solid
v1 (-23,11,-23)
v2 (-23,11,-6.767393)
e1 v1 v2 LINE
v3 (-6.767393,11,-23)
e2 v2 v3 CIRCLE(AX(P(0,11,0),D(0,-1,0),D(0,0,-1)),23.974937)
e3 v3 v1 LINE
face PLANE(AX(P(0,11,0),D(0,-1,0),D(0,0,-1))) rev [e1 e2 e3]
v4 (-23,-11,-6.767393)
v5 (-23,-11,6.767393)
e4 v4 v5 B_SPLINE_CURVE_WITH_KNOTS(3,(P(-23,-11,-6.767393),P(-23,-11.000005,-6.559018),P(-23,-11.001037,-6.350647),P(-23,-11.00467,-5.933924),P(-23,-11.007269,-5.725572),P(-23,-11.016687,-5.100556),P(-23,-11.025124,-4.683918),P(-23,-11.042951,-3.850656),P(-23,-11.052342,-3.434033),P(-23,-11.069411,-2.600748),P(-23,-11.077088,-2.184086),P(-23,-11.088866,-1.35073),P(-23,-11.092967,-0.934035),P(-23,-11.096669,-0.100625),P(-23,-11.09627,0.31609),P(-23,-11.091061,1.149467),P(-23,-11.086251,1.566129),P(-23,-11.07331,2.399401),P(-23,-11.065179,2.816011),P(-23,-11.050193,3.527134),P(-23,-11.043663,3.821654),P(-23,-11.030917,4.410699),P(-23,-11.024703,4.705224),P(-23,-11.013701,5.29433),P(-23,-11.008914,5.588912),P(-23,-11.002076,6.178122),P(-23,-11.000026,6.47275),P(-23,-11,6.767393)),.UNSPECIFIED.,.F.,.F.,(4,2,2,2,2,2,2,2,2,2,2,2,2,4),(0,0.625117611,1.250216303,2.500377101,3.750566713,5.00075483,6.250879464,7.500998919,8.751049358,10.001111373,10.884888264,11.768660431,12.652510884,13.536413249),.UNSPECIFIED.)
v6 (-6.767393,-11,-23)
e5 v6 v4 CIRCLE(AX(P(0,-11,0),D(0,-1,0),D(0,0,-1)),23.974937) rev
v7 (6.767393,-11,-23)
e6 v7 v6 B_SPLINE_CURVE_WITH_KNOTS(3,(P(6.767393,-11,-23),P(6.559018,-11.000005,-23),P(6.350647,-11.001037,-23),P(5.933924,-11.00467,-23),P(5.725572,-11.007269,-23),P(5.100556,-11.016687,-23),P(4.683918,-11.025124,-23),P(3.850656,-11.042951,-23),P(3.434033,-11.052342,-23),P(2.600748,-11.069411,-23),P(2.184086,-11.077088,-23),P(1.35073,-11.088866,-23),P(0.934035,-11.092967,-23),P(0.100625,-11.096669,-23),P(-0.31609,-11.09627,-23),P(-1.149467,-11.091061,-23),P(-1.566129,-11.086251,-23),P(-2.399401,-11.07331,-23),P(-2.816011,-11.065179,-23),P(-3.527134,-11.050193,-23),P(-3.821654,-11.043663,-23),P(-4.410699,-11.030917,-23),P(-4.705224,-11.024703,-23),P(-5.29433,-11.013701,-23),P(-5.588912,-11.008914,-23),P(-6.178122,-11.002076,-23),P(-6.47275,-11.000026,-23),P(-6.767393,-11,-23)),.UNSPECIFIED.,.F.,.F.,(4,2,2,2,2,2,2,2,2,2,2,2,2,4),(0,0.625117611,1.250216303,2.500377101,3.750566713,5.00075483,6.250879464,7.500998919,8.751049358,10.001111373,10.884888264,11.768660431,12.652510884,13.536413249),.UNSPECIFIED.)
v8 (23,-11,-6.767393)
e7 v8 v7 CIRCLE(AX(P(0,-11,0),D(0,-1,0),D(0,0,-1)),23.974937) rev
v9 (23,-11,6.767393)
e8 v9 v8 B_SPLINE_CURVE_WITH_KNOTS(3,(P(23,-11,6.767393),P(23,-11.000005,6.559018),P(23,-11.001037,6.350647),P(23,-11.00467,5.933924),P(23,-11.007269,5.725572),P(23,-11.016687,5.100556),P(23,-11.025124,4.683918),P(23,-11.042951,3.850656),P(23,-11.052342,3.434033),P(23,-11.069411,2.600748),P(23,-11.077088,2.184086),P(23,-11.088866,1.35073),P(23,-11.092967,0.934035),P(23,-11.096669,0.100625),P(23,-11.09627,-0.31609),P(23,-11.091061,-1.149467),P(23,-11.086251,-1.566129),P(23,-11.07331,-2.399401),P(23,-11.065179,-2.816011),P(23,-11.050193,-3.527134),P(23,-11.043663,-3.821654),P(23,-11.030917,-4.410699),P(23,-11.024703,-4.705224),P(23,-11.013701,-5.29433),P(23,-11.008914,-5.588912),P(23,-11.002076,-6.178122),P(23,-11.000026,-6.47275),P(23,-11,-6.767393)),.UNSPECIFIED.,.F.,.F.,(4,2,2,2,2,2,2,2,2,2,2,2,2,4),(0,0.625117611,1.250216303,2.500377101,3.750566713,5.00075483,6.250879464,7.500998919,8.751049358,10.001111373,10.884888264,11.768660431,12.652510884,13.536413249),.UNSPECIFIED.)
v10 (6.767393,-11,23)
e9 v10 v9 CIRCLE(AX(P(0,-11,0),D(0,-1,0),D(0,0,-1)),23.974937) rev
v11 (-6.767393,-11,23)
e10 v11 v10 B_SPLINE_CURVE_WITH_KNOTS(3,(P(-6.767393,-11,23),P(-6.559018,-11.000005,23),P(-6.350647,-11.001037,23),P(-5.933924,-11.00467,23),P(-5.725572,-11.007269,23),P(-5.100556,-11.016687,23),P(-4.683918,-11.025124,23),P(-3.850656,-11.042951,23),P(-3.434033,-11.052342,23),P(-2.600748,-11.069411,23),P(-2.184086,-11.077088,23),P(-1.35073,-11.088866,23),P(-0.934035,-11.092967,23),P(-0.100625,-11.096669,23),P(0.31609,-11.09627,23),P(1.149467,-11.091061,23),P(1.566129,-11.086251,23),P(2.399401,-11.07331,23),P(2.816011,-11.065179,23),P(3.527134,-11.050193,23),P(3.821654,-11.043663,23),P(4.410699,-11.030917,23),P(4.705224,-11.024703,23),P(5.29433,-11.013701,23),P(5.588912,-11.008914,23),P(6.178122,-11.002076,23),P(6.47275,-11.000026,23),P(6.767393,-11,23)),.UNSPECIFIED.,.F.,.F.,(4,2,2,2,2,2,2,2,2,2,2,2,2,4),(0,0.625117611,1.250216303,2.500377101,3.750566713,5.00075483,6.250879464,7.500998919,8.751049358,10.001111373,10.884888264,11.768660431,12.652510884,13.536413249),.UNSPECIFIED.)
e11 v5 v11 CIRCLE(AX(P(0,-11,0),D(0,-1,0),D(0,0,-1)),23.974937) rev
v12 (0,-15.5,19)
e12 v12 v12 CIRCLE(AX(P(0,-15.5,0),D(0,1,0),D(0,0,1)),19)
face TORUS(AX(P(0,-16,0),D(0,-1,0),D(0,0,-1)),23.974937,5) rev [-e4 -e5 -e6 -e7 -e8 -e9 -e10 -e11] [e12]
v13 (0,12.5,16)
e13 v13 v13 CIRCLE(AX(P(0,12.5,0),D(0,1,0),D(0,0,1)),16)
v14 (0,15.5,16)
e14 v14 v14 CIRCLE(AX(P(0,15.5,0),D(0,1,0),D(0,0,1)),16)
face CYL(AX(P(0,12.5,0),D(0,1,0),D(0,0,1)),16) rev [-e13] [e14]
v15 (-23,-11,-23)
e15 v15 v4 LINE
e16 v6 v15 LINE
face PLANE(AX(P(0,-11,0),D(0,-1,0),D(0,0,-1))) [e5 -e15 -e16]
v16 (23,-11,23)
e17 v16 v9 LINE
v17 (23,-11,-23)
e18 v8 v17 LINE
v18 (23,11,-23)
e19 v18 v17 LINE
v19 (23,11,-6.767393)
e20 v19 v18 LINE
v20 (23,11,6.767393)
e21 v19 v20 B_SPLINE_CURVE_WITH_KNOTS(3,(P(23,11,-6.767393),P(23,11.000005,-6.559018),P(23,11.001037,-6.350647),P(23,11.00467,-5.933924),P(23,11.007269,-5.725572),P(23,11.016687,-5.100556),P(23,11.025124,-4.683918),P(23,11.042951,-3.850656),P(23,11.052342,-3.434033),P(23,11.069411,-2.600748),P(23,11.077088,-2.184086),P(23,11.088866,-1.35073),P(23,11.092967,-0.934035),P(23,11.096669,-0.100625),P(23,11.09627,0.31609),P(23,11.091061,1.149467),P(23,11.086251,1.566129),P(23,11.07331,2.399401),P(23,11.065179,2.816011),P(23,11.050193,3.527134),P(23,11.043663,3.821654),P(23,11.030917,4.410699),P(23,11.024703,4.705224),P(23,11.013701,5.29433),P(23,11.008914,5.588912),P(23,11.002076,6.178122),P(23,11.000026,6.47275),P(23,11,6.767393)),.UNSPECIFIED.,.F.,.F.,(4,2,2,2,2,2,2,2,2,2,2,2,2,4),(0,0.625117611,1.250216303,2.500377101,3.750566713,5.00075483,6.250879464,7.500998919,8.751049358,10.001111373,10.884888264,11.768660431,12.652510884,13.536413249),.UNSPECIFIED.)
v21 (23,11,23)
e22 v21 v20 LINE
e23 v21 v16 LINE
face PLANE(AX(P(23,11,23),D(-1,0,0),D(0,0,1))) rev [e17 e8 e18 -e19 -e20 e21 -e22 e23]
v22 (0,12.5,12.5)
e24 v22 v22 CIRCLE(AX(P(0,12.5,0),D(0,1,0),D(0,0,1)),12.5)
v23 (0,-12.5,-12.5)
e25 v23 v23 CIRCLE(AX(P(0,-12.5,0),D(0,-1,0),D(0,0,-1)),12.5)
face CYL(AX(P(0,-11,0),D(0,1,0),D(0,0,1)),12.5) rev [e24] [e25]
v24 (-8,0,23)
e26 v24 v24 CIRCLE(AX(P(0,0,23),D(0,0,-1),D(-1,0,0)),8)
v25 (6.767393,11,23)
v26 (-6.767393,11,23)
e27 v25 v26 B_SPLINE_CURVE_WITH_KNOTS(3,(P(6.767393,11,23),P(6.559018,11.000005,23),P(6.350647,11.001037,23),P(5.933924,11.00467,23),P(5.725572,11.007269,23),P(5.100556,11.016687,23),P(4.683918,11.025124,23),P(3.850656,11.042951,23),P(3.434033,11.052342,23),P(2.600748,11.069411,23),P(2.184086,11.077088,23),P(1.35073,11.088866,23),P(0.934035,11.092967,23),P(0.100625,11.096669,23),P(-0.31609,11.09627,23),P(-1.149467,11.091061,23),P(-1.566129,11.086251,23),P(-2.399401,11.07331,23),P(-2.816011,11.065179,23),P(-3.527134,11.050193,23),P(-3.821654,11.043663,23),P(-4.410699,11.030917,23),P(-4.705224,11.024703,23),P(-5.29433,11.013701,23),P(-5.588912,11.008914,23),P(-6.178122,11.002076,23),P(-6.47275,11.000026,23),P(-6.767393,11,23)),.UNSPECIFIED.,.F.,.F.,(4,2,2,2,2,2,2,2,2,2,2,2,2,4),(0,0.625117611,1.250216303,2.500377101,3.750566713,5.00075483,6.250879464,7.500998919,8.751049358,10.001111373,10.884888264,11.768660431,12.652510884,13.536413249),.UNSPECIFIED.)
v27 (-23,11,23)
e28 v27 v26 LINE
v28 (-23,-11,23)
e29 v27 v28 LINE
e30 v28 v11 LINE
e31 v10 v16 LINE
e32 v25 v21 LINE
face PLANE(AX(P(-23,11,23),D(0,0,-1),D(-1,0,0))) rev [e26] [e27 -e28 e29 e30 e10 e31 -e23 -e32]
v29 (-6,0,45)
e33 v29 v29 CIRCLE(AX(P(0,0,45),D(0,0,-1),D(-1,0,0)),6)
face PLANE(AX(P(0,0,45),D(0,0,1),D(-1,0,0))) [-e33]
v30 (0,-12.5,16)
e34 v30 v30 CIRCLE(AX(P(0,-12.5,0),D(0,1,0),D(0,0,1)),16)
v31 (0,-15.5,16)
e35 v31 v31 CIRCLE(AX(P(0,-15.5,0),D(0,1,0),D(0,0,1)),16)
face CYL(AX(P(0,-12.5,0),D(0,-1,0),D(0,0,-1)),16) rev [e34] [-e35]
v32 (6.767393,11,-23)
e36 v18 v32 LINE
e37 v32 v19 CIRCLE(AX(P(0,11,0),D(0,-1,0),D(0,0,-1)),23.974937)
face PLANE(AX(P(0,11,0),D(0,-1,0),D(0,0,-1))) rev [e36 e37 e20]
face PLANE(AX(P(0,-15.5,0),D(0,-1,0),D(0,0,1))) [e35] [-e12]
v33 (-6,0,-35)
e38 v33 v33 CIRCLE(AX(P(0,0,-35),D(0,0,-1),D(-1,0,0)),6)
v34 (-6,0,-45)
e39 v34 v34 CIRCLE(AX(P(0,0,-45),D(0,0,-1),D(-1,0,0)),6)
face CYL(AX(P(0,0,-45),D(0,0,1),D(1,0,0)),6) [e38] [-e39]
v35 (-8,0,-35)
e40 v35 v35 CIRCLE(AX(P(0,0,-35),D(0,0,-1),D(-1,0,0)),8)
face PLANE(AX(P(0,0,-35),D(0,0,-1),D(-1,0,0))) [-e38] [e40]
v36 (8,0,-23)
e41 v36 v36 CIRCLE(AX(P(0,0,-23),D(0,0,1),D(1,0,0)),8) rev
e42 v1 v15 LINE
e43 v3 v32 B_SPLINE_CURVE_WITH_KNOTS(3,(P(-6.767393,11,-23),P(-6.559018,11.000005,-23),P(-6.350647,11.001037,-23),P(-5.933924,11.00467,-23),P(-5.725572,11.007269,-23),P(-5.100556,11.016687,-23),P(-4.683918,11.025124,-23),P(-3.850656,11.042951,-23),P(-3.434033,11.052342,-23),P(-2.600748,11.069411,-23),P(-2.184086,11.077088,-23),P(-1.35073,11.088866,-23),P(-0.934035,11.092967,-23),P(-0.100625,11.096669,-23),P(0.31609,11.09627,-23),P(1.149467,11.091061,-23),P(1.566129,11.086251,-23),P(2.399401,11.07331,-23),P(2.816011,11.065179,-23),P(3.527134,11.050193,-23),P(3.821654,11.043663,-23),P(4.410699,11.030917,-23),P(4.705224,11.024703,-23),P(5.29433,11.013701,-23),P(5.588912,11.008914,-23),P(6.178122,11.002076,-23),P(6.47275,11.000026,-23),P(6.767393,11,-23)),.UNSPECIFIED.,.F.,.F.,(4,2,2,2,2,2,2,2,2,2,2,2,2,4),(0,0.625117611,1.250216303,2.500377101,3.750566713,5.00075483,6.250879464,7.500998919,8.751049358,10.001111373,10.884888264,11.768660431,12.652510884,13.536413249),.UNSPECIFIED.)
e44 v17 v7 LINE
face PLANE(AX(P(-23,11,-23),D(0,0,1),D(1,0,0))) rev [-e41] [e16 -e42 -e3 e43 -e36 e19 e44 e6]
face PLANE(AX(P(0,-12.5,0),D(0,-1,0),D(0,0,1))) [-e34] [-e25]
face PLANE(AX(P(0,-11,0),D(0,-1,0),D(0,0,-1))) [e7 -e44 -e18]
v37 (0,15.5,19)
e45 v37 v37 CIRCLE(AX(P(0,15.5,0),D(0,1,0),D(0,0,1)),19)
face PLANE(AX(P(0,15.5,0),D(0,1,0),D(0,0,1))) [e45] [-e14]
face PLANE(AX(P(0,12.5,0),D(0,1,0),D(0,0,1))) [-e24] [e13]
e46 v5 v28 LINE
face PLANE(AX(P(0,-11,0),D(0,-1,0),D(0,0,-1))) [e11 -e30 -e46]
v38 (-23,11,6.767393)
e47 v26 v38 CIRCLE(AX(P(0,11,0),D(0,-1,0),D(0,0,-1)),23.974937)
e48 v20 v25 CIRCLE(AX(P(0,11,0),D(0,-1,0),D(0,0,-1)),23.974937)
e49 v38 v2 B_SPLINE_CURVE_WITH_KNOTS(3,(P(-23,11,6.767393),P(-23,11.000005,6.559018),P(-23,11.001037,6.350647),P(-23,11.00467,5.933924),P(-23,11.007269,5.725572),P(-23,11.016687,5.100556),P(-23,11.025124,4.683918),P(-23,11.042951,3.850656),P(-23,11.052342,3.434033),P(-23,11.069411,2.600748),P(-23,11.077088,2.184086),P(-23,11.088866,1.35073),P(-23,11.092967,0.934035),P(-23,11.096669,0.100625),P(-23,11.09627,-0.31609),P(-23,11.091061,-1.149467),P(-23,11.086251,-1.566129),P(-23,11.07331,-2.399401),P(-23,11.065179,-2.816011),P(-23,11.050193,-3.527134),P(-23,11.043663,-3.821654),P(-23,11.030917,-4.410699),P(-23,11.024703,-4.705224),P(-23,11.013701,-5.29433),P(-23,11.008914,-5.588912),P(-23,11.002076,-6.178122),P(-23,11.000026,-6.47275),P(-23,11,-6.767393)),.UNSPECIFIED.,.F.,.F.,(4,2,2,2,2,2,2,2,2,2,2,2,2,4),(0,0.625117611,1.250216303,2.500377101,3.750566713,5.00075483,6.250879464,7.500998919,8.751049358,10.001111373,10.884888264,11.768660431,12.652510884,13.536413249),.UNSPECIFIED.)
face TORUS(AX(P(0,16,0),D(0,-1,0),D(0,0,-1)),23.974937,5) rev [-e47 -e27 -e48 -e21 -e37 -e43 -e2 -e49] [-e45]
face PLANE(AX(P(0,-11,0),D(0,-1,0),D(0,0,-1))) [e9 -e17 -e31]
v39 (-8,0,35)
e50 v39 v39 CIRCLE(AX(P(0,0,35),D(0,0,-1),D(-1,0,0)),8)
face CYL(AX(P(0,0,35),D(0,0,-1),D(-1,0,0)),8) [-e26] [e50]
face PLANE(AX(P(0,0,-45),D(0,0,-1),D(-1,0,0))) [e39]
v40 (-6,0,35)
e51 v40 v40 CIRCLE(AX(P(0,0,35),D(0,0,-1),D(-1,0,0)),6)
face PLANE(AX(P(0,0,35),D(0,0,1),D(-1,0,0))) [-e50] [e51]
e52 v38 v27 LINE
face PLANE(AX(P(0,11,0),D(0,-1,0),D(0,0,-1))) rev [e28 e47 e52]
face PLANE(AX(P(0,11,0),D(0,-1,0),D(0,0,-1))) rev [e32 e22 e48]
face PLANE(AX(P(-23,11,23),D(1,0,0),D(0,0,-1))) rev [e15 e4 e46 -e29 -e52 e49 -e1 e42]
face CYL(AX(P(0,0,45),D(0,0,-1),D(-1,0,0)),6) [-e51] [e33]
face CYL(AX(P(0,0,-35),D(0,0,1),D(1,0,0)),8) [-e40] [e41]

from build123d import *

# Parameters (mm, degrees)
SKETCH1_W           = 46
SKETCH1_H           = 46
BOSS_EXTRUDE1_DEPTH = 11
SKETCH2_R           = 19
BOSS_EXTRUDE2_DEPTH = 4.5
FILLET1_R           = 5
SKETCH3_R           = 16
CUT_EXTRUDE1_DEPTH  = 3
SKETCH4_R           = 12.5
CUT_EXTRUDE2_DEPTH  = 41.127920628
MIRROR1_START       = -12.5
MIRROR1_OUTLINE_R   = 16
MIRROR1_DEPTH       = 23.5
MIRROR1_START_2     = -15.5
MIRROR1_2_OUTLINE_W = 46
MIRROR1_2_OUTLINE_H = 46
MIRROR1_2_OUTLINE_R = 16
MIRROR1_2_DEPTH     = 4.5
SKETCH5_R           = 12.5
CUT_EXTRUDE3_DEPTH  = 42.955333564
SKETCH6_R           = 8
BOSS_EXTRUDE3_DEPTH = 12
SKETCH7_R           = 6
BOSS_EXTRUDE4_DEPTH = 10


with BuildPart() as part:
    # Sketch1 → Boss-Extrude1 (new, symmetric)
    with BuildSketch(Plane(origin=(0, 0, 0), x_dir=(1, 0, 0), z_dir=(0, 1, 0))):
        Rectangle(SKETCH1_W, SKETCH1_H)
    extrude(amount=BOSS_EXTRUDE1_DEPTH, both=True)

    # Sketch2 → Boss-Extrude2 (add)
    with BuildSketch(Plane(origin=(0, 11, 0), x_dir=(1, 0, 0), z_dir=(0, 1, 0))):
        with Locations(Location((0, 0, 0), (0, 0, 270))):
            Circle(SKETCH2_R)
    extrude(amount=BOSS_EXTRUDE2_DEPTH)

    # Fillet1
    # the kernel refuses this fillet: 5 mm, written as the material it adds along each edge
    with BuildSketch(Plane(origin=(0, 11, 0), x_dir=(0, 0, 1), z_dir=(-1, 0, 0))) as fillet1_piece_1_section:
        with BuildLine():
            CenterArc((23.974937186, 5), FILLET1_R, 185.739170477, 84.260829523)
            Line((19, 4.5), (19, 0))
            Line((19, 0), (23.974937186, 0))
        make_face()
    fillet1_piece_1 = revolve(axis=Axis((0, 11, 0), (0, 1, 0)), mode=Mode.PRIVATE)
    fillet1_piece_1 = split(fillet1_piece_1, bisect_by=Plane(origin=(0, 11, 23), z_dir=(0, 0, -1)), keep=Keep.TOP, mode=Mode.PRIVATE)
    fillet1_piece_1 = split(fillet1_piece_1, bisect_by=Plane(origin=(23, 11, 0), z_dir=(-1, 0, 0)), keep=Keep.TOP, mode=Mode.PRIVATE)
    fillet1_piece_1 = split(fillet1_piece_1, bisect_by=Plane(origin=(-23, 11, 0), z_dir=(1, 0, 0)), keep=Keep.TOP, mode=Mode.PRIVATE)
    fillet1_piece_1 = split(fillet1_piece_1, bisect_by=Plane(origin=(0, 11, -23), z_dir=(0, 0, 1)), keep=Keep.TOP, mode=Mode.PRIVATE)
    add(fillet1_piece_1)

    # Sketch3 → Cut-Extrude1 (cut)
    with BuildSketch(Plane(origin=(0, 15.5, 0), x_dir=(1, 0, 0), z_dir=(0, 1, 0))):
        with Locations(Location((0, 0, 0), (0, 0, 270))):
            Circle(SKETCH3_R)
    extrude(amount=-CUT_EXTRUDE1_DEPTH, mode=Mode.SUBTRACT)

    # Sketch4 → Cut-Extrude2 (cut, through all)
    with BuildSketch(Plane(origin=(0, 12.5, 0), x_dir=(1, 0, 0), z_dir=(0, 1, 0))):
        with Locations(Location((0, 0, 0), (0, 0, 270))):
            Circle(SKETCH4_R)
    extrude(amount=-CUT_EXTRUDE2_DEPTH, mode=Mode.SUBTRACT)

    # Mirror1: read off the stored shape, not the designer's step
    # Mirror1 outline → Mirror1 (add)
    with BuildSketch(Plane(origin=(0, 0, 0), x_dir=(1, 0, 0), z_dir=(0, 1, 0)).offset(MIRROR1_START)):
        Circle(MIRROR1_OUTLINE_R)
    extrude(amount=MIRROR1_DEPTH)

    # Mirror1 2 outline → Mirror1 2 (add)
    with BuildSketch(Plane(origin=(0, 0, 0), x_dir=(1, 0, 0), z_dir=(0, 1, 0)).offset(MIRROR1_START_2)):
        Rectangle(MIRROR1_2_OUTLINE_W, MIRROR1_2_OUTLINE_H)
        Circle(MIRROR1_2_OUTLINE_R, mode=Mode.SUBTRACT)
    extrude(amount=MIRROR1_2_DEPTH)

    # Mirror1 3 outline → Mirror1 3 (revolve, cut)
    with BuildSketch(Plane.XY):
        with BuildLine():
            Line((32.526911935, -11), (23.974937186, -11))
            ThreePointArc((23.974937186, -11), (20.620835219, -12.291900756), (19, -15.5))
            Line((19, -15.5), (32.526911935, -15.5))
            Line((32.526911935, -15.5), (32.526911935, -11))
        make_face()
    revolve(axis=Axis((0, 0, 0), (0, 1, 0)), mode=Mode.SUBTRACT)

    # Sketch5 → Cut-Extrude3 (cut, through all)
    with BuildSketch(Plane(origin=(0, 11, 0), x_dir=(1, 0, 0), z_dir=(0, 1, 0))):
        with Locations(Location((0, 0, 0), (0, 0, 270))):
            Circle(SKETCH5_R)
    extrude(amount=-CUT_EXTRUDE3_DEPTH, mode=Mode.SUBTRACT)

    # Sketch6 → Boss-Extrude3 (add)
    with BuildSketch(Plane(origin=(0, 0, -23), x_dir=(-1, 0, 0), z_dir=(0, 0, -1))):
        with Locations(Location((0, 0, 0), (0, 0, 180))):
            Circle(SKETCH6_R)
    boss_extrude3 = extrude(amount=BOSS_EXTRUDE3_DEPTH)

    # Sketch7 → Boss-Extrude4 (add)
    with BuildSketch(Plane(origin=(0, 0, -35), x_dir=(-1, 0, 0), z_dir=(0, 0, -1))):
        Circle(SKETCH7_R)
    boss_extrude4 = extrude(amount=BOSS_EXTRUDE4_DEPTH)

    # Mirror2: Boss-Extrude3, Boss-Extrude4 across plane
    add(boss_extrude3.mirror(Plane.XY))
    add(boss_extrude4.mirror(Plane.XY))


solid = part.part
